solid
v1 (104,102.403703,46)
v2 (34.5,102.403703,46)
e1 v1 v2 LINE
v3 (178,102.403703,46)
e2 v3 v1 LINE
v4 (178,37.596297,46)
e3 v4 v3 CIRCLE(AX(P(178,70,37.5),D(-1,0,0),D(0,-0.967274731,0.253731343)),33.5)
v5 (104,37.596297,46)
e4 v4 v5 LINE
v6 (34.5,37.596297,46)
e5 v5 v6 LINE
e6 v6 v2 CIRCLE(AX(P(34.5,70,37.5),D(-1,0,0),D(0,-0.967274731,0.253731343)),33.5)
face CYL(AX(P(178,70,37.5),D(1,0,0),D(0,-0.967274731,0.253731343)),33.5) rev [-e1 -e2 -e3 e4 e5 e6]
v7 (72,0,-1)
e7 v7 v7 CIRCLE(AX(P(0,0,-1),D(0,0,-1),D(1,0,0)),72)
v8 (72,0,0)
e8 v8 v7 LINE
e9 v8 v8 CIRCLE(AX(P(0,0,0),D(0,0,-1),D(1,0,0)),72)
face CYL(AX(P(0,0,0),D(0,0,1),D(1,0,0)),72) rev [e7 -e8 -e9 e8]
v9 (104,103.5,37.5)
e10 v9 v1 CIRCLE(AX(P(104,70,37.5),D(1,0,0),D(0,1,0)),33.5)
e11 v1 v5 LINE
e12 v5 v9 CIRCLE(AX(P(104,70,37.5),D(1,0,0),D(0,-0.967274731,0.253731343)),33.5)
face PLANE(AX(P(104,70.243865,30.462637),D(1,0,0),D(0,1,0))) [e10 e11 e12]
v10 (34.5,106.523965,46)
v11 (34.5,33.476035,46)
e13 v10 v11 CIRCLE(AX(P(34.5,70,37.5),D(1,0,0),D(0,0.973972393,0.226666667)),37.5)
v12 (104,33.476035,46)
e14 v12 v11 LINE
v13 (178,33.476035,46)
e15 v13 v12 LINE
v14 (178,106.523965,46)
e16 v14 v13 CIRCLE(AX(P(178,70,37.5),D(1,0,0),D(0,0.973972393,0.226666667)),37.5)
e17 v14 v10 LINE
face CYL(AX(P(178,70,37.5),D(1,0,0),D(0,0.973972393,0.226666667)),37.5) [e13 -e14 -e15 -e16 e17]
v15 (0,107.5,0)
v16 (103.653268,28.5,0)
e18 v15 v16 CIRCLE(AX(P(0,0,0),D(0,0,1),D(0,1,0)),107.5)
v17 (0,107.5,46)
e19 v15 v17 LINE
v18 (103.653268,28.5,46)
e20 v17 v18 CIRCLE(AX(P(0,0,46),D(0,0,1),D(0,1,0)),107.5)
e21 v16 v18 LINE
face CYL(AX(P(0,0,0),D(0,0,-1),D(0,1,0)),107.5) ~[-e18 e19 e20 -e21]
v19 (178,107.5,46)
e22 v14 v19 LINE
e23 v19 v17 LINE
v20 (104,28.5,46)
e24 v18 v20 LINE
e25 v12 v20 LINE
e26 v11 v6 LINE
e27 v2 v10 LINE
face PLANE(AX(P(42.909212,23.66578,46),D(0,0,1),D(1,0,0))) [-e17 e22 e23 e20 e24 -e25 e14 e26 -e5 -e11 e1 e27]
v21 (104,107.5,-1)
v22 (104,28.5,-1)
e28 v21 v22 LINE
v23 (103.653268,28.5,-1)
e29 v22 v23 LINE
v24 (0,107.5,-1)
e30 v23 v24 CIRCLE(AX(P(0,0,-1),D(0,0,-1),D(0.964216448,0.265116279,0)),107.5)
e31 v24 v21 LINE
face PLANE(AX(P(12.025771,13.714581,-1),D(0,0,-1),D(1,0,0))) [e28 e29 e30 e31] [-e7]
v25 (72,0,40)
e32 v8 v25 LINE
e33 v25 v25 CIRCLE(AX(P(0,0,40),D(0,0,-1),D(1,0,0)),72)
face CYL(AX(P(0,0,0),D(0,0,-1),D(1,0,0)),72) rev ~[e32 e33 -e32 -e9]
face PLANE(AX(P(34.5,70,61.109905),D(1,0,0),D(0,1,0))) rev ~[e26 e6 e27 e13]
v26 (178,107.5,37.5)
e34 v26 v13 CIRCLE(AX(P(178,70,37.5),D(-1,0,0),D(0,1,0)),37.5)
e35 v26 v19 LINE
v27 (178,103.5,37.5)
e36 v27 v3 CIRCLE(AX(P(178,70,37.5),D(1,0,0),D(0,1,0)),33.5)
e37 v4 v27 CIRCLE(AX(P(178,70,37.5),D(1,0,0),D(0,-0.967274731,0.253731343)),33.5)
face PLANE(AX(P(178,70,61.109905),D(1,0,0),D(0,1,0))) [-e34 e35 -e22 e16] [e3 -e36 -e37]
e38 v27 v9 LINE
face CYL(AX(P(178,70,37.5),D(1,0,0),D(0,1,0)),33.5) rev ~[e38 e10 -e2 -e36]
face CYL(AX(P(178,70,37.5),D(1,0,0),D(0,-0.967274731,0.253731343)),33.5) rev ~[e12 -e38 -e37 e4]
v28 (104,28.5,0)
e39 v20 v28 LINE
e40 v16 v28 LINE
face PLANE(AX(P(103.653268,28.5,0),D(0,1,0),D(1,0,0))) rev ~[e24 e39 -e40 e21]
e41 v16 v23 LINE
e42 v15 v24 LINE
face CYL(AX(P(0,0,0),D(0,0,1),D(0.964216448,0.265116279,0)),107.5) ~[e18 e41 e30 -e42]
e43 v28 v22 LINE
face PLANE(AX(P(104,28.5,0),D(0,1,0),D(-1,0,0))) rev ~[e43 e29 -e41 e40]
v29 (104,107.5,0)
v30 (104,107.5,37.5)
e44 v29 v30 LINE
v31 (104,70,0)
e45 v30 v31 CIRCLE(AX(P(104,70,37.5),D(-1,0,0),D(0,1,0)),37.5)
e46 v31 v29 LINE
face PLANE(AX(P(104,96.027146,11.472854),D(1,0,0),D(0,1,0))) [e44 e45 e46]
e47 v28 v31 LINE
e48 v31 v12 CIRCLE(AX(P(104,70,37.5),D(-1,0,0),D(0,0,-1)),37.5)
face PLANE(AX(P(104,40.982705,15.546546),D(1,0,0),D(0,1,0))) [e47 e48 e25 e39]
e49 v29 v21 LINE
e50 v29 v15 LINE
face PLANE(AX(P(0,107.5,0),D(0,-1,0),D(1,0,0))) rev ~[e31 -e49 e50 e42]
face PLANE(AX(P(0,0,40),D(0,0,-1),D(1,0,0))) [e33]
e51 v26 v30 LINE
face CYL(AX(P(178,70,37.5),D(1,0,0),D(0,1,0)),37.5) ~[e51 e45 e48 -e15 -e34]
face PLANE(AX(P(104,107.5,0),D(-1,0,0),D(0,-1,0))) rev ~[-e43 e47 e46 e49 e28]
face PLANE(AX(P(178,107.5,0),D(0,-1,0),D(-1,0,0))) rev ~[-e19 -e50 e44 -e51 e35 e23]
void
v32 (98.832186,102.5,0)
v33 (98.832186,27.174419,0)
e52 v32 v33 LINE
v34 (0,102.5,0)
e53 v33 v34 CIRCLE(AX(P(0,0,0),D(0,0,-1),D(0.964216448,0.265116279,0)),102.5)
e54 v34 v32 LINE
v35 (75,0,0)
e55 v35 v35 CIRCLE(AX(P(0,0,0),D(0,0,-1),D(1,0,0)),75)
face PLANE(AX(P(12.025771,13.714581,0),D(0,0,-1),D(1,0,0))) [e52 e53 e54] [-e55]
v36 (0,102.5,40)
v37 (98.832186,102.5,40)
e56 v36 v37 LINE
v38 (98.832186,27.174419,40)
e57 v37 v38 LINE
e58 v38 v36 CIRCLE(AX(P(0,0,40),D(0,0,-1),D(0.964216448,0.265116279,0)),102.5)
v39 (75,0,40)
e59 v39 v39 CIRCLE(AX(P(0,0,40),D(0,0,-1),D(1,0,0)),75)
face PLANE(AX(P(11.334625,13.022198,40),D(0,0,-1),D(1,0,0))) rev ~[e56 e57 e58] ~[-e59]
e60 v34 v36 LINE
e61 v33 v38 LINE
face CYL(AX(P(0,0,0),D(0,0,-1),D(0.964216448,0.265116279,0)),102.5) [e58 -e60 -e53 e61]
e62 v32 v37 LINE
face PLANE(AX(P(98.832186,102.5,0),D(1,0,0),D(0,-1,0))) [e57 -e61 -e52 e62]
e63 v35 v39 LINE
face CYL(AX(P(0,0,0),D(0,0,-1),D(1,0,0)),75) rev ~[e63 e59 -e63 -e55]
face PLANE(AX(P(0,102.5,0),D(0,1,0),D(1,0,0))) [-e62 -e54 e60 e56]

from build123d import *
from build123d import SkipClean  # not in build123d's __all__

# Parameters (mm, degrees)
F1_DEPTH = 46
F3_DEPTH = 74
F4_DEPTH = 143.5
F5_R     = 75
F5_R_2   = 72
F6_DEPTH = 40
F7_R     = 72
F8_DEPTH = 1


# Not quite as in the source:
# - after a boolean that leaves OpenCascade's solid faulty, fix() repairs it


with BuildPart() as f1:
    # F0 (on Top) → F1 (new body)
    with BuildSketch(Plane.XY):
        with BuildLine():
            Line((178, 107.5), (0, 107.5))
            ThreePointArc((0, 107.5), (-65.1632565178, -85.4985379992), (103.6532681588, 28.5))
            Line((103.6532681588, 28.5), (178, 28.5))
            Line((178, 28.5), (178, 107.5))
        make_face()
    extrude(amount=F1_DEPTH)

    # F2 (on face) → F3 (cut)
    with BuildSketch(Plane.YZ.offset(178)):
        with BuildLine():
            ThreePointArc((70, 0), (40.6316496888, 14.1815523673), (33.4760352645, 46))
            Line((33.4760352645, 46), (28.5, 46))
            Line((28.5, 46), (28.5, 0))
            Line((28.5, 0), (70, 0))
        make_face()
        with BuildLine():
            Line((107.5, 0), (107.5, 37.5))
            ThreePointArc((107.5, 37.5), (96.5165042945, 10.9834957055), (70, 0))
            Line((70, 0), (107.5, 0))
        make_face()
        with BuildLine():
            ThreePointArc((37.596296508, 46), (65.714796795, 4.275204538), (103.5, 37.5))
            ThreePointArc((103.5, 37.5), (103.224795462, 41.785203205), (102.403703492, 46))
            Line((102.403703492, 46), (37.596296508, 46))
        make_face()
    extrude(amount=-F3_DEPTH, mode=Mode.SUBTRACT)

    # F2 (on face) → F4 (join)
    with BuildSketch(Plane.YZ.offset(178)):
        with BuildLine():
            ThreePointArc((37.596296508, 46), (70, 71), (102.403703492, 46))
            Line((102.403703492, 46), (106.5239647355, 46))
            ThreePointArc((106.5239647355, 46), (70, 75), (33.4760352645, 46))
            Line((33.4760352645, 46), (37.596296508, 46))
        make_face()
    with SkipClean():  # cleaning this boolean's faces spoils the solid; the shape is the same uncleaned
        extrude(amount=-F4_DEPTH)

    # F5 (on face) → F6 (cut)
    with BuildSketch(Plane(origin=(0, 0, 0), x_dir=(1, 0, 0), z_dir=(0, 0, -1))):
        with BuildLine():
            ThreePointArc((98.8321859189, -27.1744186047), (-62.1324073774, 81.5218618132), (0, -102.5))
            Line((0, -102.5), (98.8321859189, -102.5))
            Line((98.8321859189, -102.5), (98.8321859189, -27.1744186047))
        make_face()
        Circle(F5_R, mode=Mode.SUBTRACT)
        Circle(F5_R_2)
    extrude(amount=-F6_DEPTH, mode=Mode.SUBTRACT)

    add(f1.part.fix(), mode=Mode.REPLACE)

    # F7 (on face) → F8 (join)
    with BuildSketch(Plane(origin=(0, 0, 0), x_dir=(1, 0, 0), z_dir=(0, 0, -1))):
        with BuildLine():
            ThreePointArc((103.6532681588, -28.5), (-65.1632565178, 85.4985379992), (0, -107.5))
            Line((0, -107.5), (104, -107.5))
            Line((104, -107.5), (104, -70))
            Line((104, -70), (104, -28.5))
            Line((104, -28.5), (103.6532681588, -28.5))
        make_face()
        with BuildLine():
            ThreePointArc((0, -102.5), (-62.1324073774, 81.5218618132), (98.8321859189, -27.1744186047))
            Line((98.8321859189, -27.1744186047), (98.8321859189, -102.5))
            Line((98.8321859189, -102.5), (0, -102.5))
        make_face(mode=Mode.SUBTRACT)
        with BuildLine():
            Line((98.8321859189, -102.5), (98.8321859189, -27.1744186047))
            ThreePointArc((98.8321859189, -27.1744186047), (-62.1324073774, 81.5218618132), (0, -102.5))
            Line((0, -102.5), (98.8321859189, -102.5))
        make_face()
        Circle(F7_R, mode=Mode.SUBTRACT)
    extrude(amount=F8_DEPTH)


solid = f1.part
